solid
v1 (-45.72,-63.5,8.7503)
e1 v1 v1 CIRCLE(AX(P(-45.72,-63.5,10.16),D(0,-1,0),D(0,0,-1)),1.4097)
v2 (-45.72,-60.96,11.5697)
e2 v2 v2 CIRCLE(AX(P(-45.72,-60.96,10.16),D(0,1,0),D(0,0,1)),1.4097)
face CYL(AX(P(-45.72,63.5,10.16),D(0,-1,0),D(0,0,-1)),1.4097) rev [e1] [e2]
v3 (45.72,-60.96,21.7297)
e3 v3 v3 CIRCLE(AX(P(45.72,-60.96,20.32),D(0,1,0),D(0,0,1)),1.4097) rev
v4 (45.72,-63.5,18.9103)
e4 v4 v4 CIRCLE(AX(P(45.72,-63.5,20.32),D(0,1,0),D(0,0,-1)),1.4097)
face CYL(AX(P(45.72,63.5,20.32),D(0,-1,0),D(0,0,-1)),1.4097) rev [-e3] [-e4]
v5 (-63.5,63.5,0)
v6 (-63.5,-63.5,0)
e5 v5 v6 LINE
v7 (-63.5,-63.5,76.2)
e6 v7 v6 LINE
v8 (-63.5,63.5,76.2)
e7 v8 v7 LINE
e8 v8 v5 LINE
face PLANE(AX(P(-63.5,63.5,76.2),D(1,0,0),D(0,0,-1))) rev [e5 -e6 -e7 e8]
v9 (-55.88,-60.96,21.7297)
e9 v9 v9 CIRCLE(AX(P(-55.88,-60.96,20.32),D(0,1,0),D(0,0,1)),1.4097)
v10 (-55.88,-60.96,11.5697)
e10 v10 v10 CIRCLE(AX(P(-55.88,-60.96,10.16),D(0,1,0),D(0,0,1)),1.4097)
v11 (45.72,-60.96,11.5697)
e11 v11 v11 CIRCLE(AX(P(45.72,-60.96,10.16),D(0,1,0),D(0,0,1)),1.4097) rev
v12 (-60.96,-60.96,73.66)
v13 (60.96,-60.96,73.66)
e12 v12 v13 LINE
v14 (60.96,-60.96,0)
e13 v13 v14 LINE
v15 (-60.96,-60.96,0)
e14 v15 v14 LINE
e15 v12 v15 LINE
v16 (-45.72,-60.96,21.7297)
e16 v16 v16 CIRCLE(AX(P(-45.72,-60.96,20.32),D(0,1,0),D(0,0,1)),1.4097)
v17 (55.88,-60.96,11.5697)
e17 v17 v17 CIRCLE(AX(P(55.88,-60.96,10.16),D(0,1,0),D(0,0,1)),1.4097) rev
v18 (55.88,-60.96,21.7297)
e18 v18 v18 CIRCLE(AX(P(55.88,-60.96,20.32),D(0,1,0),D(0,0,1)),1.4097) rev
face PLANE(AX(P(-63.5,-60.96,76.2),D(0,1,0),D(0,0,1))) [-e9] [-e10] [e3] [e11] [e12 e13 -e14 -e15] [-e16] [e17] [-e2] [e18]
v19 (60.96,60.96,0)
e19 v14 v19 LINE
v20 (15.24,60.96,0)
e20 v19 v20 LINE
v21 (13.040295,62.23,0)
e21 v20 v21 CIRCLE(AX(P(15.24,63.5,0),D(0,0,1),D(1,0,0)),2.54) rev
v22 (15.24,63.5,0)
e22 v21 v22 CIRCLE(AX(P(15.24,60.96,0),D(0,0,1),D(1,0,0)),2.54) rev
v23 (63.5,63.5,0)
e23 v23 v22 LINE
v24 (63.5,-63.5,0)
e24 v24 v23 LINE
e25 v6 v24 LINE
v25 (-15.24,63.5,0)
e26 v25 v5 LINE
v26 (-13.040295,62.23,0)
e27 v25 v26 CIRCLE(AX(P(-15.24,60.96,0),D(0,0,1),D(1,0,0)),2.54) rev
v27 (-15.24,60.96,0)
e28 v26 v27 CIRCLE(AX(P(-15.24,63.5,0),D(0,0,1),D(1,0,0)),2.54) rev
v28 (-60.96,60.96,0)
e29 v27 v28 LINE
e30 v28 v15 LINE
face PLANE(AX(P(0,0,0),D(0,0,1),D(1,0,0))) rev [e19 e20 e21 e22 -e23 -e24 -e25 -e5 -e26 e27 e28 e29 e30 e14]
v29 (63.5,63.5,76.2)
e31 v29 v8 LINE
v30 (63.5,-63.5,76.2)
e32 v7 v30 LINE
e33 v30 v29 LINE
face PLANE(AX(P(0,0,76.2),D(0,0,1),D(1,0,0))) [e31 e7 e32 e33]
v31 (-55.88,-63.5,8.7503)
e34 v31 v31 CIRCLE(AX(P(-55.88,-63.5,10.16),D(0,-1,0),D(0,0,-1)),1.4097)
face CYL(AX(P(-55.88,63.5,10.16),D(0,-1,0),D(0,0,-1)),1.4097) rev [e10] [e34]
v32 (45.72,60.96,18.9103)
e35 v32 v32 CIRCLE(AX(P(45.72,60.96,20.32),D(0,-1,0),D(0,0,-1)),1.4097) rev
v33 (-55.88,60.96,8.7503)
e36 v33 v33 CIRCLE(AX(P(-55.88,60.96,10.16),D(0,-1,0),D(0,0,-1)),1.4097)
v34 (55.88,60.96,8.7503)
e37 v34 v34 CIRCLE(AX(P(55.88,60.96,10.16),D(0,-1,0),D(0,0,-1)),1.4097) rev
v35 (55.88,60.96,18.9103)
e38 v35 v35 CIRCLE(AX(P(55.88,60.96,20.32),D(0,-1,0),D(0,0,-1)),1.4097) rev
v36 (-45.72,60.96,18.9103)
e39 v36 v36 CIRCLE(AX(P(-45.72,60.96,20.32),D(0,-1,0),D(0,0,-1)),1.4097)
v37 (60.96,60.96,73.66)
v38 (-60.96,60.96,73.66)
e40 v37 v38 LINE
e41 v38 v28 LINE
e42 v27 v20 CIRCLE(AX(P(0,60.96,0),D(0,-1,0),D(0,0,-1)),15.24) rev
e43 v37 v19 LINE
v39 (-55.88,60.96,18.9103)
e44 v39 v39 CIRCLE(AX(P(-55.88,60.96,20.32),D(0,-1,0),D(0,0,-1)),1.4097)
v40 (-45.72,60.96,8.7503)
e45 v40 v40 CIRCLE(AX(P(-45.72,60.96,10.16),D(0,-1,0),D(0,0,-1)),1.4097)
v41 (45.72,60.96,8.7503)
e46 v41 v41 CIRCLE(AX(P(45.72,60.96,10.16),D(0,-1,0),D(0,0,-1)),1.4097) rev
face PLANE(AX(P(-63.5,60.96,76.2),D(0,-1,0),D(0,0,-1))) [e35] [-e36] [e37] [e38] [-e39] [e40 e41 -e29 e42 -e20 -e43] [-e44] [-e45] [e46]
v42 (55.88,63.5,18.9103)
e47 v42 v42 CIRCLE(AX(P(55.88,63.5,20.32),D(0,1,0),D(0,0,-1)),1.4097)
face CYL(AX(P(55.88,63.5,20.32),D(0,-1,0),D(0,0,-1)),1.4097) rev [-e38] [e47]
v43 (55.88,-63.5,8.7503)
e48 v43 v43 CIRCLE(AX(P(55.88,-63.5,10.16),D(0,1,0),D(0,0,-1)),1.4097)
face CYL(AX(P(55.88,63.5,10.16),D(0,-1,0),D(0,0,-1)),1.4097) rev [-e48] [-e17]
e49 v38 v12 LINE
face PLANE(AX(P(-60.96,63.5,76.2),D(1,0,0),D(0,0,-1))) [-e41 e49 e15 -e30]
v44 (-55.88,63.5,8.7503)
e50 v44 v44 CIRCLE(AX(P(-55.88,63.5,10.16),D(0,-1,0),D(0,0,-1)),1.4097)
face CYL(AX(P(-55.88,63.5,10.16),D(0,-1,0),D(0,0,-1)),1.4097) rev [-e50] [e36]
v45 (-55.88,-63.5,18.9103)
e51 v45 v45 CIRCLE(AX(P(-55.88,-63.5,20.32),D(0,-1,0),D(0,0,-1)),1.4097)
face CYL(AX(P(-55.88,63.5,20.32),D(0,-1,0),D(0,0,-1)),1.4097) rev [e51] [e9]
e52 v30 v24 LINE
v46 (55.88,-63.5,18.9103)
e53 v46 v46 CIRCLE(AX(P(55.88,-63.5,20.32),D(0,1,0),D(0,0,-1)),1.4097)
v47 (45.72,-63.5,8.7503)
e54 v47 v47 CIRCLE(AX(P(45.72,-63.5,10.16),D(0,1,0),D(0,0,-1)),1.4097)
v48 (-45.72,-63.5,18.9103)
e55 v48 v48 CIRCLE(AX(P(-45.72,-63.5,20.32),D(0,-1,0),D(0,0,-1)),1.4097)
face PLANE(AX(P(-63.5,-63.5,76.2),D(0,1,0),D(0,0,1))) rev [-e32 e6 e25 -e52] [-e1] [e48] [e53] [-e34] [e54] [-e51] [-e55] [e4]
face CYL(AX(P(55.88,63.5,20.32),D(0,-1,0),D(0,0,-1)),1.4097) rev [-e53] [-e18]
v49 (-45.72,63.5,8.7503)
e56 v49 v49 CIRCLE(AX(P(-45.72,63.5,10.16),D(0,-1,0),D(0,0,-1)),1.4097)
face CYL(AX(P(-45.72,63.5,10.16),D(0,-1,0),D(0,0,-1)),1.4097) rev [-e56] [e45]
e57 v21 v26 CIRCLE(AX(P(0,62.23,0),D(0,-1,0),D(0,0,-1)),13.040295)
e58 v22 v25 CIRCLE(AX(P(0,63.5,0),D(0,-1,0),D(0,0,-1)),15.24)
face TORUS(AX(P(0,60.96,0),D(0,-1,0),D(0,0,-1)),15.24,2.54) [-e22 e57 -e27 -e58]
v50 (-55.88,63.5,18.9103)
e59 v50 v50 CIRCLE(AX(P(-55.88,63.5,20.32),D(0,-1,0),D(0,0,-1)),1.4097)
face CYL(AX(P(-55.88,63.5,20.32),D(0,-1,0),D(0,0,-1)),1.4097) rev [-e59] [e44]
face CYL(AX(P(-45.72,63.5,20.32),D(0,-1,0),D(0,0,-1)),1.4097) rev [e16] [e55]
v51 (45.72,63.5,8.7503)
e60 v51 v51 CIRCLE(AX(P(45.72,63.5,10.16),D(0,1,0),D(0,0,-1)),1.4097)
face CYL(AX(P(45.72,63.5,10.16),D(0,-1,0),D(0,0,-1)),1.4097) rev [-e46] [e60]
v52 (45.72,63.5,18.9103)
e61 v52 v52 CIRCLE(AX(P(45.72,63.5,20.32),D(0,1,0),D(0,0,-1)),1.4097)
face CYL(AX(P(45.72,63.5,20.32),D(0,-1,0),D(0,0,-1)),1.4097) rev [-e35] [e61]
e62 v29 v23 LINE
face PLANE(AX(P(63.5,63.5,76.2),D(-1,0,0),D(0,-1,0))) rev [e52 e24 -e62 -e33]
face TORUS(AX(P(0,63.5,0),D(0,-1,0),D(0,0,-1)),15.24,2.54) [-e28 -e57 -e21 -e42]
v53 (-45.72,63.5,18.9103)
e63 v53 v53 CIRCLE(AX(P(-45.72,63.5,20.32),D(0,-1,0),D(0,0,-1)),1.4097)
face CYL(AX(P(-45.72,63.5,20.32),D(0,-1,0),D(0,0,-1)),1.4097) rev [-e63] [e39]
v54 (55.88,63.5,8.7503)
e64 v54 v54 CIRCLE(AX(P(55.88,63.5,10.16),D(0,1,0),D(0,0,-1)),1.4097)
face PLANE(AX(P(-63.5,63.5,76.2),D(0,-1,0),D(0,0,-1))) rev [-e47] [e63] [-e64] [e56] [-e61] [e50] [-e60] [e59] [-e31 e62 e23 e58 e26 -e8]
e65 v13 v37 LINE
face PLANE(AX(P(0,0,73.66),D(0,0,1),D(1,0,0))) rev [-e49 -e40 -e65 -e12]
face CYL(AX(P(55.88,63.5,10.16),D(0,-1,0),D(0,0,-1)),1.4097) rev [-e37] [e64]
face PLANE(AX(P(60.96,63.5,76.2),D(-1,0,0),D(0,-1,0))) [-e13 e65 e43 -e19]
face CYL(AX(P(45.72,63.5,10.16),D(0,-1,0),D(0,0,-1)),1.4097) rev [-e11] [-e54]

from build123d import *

# Parameters (mm, degrees)
SKETCH1_W               = 127
SKETCH1_H               = 127
BOSS_EXTRUDE1_DEPTH     = 76.2
SHELL2_T                = -2.54
CUT_EXTRUDE1_DEPTH      = 162.144934764
CUT_EXTRUDE1_DEPTH_BACK = 2.54
FILLET3_R               = 2.54
SKETCH3_R               = 1.4097
CUT_EXTRUDE2_DEPTH      = 162.144934764


with BuildPart() as part:
    # Sketch1 → Boss-Extrude1 (new body)
    with BuildSketch(Plane.XY):
        Rectangle(SKETCH1_W, SKETCH1_H)
    extrude(amount=BOSS_EXTRUDE1_DEPTH)

    # Shell2
    shell2_openings = [part.faces().sort_by_distance(p)[0] for p in [
        (0, 0, 0),
    ]]
    offset(amount=SHELL2_T, openings=shell2_openings, kind=Kind.INTERSECTION)

    # Sketch2 → Cut-Extrude1 (cut, two sides: drawn at the far end of the back side and taken through both)
    with BuildSketch(Plane(origin=(0, 63.5, 0), x_dir=(1, 0, 0), z_dir=(0, 1, 0)).offset(-CUT_EXTRUDE1_DEPTH_BACK)):
        with BuildLine():
            Line((-12.7, 225.526146906), (-12.7, 0))
            ThreePointArc((-12.7, 0), (0, -12.7), (12.7, 0))
            Line((12.7, 0), (12.7, 225.526146906))
            Line((12.7, 225.526146906), (12.7, 676.578440717))
            Line((12.7, 676.578440717), (-12.7, 676.578440717))
            Line((-12.7, 676.578440717), (-12.7, 225.526146906))
        make_face()
    extrude(amount=CUT_EXTRUDE1_DEPTH + CUT_EXTRUDE1_DEPTH_BACK, mode=Mode.SUBTRACT)

    # Fillet3
    # the kernel refuses this fillet: 2.54 mm, written as the material it takes off along each edge
    with BuildSketch(Plane(origin=(0, 60.96, 0), x_dir=(-0.8771967747646356, 0, -0.4801310428857115), z_dir=(0.4801310428857115, 0, -0.8771967747646356))) as fillet3_piece_1:
        with BuildLine():
            CenterArc((12.7 + FILLET3_R, FILLET3_R), FILLET3_R, 180, 90)
            Line((12.7 + FILLET3_R, 0), (12.7, 0))
            Line((12.7, 0), (12.7, FILLET3_R))
        make_face()
    revolve(axis=Axis((0, 60.96, 0), (0, 1, 0)), revolution_arc=237.38792196, mode=Mode.SUBTRACT)
    with BuildSketch(Plane(origin=(0, 63.5, 0), x_dir=(0.8771967747646356, 0, -0.4801310428857116), z_dir=(-0.4801310428857116, 0, -0.8771967747646356))) as fillet3_piece_2:
        with BuildLine():
            CenterArc((12.7 + FILLET3_R, FILLET3_R), FILLET3_R, 180, 90)
            Line((12.7, FILLET3_R), (12.7, 0))
            Line((12.7, 0), (12.7 + FILLET3_R, 0))
        make_face()
    revolve(axis=Axis((0, 63.5, 0), (0, -1, 0)), revolution_arc=237.38792196, mode=Mode.SUBTRACT)

    # Sketch3 → Cut-Extrude2 (cut, through all)
    with BuildSketch(Plane.XZ.offset(63.5)):
        with Locations(Location((-55.88, 20.32, 0), (0, 0, 270))):
            Circle(SKETCH3_R)
        with Locations(Location((-45.72, 20.32, 0), (0, 0, 270))):
            Circle(SKETCH3_R)
        with Locations(Location((-55.88, 10.16, 0), (0, 0, 270))):
            Circle(SKETCH3_R)
        with Locations(Location((-45.72, 10.16, 0), (0, 0, 270))):
            Circle(SKETCH3_R)
    cut_extrude2 = extrude(amount=-CUT_EXTRUDE2_DEPTH, mode=Mode.SUBTRACT)

    # Mirror1: Cut-Extrude2 across plane
    add(cut_extrude2.mirror(Plane(origin=(0, 0, 0), x_dir=(0, 0, 1), z_dir=(1, 0, 0))), mode=Mode.SUBTRACT)


solid = part.part
